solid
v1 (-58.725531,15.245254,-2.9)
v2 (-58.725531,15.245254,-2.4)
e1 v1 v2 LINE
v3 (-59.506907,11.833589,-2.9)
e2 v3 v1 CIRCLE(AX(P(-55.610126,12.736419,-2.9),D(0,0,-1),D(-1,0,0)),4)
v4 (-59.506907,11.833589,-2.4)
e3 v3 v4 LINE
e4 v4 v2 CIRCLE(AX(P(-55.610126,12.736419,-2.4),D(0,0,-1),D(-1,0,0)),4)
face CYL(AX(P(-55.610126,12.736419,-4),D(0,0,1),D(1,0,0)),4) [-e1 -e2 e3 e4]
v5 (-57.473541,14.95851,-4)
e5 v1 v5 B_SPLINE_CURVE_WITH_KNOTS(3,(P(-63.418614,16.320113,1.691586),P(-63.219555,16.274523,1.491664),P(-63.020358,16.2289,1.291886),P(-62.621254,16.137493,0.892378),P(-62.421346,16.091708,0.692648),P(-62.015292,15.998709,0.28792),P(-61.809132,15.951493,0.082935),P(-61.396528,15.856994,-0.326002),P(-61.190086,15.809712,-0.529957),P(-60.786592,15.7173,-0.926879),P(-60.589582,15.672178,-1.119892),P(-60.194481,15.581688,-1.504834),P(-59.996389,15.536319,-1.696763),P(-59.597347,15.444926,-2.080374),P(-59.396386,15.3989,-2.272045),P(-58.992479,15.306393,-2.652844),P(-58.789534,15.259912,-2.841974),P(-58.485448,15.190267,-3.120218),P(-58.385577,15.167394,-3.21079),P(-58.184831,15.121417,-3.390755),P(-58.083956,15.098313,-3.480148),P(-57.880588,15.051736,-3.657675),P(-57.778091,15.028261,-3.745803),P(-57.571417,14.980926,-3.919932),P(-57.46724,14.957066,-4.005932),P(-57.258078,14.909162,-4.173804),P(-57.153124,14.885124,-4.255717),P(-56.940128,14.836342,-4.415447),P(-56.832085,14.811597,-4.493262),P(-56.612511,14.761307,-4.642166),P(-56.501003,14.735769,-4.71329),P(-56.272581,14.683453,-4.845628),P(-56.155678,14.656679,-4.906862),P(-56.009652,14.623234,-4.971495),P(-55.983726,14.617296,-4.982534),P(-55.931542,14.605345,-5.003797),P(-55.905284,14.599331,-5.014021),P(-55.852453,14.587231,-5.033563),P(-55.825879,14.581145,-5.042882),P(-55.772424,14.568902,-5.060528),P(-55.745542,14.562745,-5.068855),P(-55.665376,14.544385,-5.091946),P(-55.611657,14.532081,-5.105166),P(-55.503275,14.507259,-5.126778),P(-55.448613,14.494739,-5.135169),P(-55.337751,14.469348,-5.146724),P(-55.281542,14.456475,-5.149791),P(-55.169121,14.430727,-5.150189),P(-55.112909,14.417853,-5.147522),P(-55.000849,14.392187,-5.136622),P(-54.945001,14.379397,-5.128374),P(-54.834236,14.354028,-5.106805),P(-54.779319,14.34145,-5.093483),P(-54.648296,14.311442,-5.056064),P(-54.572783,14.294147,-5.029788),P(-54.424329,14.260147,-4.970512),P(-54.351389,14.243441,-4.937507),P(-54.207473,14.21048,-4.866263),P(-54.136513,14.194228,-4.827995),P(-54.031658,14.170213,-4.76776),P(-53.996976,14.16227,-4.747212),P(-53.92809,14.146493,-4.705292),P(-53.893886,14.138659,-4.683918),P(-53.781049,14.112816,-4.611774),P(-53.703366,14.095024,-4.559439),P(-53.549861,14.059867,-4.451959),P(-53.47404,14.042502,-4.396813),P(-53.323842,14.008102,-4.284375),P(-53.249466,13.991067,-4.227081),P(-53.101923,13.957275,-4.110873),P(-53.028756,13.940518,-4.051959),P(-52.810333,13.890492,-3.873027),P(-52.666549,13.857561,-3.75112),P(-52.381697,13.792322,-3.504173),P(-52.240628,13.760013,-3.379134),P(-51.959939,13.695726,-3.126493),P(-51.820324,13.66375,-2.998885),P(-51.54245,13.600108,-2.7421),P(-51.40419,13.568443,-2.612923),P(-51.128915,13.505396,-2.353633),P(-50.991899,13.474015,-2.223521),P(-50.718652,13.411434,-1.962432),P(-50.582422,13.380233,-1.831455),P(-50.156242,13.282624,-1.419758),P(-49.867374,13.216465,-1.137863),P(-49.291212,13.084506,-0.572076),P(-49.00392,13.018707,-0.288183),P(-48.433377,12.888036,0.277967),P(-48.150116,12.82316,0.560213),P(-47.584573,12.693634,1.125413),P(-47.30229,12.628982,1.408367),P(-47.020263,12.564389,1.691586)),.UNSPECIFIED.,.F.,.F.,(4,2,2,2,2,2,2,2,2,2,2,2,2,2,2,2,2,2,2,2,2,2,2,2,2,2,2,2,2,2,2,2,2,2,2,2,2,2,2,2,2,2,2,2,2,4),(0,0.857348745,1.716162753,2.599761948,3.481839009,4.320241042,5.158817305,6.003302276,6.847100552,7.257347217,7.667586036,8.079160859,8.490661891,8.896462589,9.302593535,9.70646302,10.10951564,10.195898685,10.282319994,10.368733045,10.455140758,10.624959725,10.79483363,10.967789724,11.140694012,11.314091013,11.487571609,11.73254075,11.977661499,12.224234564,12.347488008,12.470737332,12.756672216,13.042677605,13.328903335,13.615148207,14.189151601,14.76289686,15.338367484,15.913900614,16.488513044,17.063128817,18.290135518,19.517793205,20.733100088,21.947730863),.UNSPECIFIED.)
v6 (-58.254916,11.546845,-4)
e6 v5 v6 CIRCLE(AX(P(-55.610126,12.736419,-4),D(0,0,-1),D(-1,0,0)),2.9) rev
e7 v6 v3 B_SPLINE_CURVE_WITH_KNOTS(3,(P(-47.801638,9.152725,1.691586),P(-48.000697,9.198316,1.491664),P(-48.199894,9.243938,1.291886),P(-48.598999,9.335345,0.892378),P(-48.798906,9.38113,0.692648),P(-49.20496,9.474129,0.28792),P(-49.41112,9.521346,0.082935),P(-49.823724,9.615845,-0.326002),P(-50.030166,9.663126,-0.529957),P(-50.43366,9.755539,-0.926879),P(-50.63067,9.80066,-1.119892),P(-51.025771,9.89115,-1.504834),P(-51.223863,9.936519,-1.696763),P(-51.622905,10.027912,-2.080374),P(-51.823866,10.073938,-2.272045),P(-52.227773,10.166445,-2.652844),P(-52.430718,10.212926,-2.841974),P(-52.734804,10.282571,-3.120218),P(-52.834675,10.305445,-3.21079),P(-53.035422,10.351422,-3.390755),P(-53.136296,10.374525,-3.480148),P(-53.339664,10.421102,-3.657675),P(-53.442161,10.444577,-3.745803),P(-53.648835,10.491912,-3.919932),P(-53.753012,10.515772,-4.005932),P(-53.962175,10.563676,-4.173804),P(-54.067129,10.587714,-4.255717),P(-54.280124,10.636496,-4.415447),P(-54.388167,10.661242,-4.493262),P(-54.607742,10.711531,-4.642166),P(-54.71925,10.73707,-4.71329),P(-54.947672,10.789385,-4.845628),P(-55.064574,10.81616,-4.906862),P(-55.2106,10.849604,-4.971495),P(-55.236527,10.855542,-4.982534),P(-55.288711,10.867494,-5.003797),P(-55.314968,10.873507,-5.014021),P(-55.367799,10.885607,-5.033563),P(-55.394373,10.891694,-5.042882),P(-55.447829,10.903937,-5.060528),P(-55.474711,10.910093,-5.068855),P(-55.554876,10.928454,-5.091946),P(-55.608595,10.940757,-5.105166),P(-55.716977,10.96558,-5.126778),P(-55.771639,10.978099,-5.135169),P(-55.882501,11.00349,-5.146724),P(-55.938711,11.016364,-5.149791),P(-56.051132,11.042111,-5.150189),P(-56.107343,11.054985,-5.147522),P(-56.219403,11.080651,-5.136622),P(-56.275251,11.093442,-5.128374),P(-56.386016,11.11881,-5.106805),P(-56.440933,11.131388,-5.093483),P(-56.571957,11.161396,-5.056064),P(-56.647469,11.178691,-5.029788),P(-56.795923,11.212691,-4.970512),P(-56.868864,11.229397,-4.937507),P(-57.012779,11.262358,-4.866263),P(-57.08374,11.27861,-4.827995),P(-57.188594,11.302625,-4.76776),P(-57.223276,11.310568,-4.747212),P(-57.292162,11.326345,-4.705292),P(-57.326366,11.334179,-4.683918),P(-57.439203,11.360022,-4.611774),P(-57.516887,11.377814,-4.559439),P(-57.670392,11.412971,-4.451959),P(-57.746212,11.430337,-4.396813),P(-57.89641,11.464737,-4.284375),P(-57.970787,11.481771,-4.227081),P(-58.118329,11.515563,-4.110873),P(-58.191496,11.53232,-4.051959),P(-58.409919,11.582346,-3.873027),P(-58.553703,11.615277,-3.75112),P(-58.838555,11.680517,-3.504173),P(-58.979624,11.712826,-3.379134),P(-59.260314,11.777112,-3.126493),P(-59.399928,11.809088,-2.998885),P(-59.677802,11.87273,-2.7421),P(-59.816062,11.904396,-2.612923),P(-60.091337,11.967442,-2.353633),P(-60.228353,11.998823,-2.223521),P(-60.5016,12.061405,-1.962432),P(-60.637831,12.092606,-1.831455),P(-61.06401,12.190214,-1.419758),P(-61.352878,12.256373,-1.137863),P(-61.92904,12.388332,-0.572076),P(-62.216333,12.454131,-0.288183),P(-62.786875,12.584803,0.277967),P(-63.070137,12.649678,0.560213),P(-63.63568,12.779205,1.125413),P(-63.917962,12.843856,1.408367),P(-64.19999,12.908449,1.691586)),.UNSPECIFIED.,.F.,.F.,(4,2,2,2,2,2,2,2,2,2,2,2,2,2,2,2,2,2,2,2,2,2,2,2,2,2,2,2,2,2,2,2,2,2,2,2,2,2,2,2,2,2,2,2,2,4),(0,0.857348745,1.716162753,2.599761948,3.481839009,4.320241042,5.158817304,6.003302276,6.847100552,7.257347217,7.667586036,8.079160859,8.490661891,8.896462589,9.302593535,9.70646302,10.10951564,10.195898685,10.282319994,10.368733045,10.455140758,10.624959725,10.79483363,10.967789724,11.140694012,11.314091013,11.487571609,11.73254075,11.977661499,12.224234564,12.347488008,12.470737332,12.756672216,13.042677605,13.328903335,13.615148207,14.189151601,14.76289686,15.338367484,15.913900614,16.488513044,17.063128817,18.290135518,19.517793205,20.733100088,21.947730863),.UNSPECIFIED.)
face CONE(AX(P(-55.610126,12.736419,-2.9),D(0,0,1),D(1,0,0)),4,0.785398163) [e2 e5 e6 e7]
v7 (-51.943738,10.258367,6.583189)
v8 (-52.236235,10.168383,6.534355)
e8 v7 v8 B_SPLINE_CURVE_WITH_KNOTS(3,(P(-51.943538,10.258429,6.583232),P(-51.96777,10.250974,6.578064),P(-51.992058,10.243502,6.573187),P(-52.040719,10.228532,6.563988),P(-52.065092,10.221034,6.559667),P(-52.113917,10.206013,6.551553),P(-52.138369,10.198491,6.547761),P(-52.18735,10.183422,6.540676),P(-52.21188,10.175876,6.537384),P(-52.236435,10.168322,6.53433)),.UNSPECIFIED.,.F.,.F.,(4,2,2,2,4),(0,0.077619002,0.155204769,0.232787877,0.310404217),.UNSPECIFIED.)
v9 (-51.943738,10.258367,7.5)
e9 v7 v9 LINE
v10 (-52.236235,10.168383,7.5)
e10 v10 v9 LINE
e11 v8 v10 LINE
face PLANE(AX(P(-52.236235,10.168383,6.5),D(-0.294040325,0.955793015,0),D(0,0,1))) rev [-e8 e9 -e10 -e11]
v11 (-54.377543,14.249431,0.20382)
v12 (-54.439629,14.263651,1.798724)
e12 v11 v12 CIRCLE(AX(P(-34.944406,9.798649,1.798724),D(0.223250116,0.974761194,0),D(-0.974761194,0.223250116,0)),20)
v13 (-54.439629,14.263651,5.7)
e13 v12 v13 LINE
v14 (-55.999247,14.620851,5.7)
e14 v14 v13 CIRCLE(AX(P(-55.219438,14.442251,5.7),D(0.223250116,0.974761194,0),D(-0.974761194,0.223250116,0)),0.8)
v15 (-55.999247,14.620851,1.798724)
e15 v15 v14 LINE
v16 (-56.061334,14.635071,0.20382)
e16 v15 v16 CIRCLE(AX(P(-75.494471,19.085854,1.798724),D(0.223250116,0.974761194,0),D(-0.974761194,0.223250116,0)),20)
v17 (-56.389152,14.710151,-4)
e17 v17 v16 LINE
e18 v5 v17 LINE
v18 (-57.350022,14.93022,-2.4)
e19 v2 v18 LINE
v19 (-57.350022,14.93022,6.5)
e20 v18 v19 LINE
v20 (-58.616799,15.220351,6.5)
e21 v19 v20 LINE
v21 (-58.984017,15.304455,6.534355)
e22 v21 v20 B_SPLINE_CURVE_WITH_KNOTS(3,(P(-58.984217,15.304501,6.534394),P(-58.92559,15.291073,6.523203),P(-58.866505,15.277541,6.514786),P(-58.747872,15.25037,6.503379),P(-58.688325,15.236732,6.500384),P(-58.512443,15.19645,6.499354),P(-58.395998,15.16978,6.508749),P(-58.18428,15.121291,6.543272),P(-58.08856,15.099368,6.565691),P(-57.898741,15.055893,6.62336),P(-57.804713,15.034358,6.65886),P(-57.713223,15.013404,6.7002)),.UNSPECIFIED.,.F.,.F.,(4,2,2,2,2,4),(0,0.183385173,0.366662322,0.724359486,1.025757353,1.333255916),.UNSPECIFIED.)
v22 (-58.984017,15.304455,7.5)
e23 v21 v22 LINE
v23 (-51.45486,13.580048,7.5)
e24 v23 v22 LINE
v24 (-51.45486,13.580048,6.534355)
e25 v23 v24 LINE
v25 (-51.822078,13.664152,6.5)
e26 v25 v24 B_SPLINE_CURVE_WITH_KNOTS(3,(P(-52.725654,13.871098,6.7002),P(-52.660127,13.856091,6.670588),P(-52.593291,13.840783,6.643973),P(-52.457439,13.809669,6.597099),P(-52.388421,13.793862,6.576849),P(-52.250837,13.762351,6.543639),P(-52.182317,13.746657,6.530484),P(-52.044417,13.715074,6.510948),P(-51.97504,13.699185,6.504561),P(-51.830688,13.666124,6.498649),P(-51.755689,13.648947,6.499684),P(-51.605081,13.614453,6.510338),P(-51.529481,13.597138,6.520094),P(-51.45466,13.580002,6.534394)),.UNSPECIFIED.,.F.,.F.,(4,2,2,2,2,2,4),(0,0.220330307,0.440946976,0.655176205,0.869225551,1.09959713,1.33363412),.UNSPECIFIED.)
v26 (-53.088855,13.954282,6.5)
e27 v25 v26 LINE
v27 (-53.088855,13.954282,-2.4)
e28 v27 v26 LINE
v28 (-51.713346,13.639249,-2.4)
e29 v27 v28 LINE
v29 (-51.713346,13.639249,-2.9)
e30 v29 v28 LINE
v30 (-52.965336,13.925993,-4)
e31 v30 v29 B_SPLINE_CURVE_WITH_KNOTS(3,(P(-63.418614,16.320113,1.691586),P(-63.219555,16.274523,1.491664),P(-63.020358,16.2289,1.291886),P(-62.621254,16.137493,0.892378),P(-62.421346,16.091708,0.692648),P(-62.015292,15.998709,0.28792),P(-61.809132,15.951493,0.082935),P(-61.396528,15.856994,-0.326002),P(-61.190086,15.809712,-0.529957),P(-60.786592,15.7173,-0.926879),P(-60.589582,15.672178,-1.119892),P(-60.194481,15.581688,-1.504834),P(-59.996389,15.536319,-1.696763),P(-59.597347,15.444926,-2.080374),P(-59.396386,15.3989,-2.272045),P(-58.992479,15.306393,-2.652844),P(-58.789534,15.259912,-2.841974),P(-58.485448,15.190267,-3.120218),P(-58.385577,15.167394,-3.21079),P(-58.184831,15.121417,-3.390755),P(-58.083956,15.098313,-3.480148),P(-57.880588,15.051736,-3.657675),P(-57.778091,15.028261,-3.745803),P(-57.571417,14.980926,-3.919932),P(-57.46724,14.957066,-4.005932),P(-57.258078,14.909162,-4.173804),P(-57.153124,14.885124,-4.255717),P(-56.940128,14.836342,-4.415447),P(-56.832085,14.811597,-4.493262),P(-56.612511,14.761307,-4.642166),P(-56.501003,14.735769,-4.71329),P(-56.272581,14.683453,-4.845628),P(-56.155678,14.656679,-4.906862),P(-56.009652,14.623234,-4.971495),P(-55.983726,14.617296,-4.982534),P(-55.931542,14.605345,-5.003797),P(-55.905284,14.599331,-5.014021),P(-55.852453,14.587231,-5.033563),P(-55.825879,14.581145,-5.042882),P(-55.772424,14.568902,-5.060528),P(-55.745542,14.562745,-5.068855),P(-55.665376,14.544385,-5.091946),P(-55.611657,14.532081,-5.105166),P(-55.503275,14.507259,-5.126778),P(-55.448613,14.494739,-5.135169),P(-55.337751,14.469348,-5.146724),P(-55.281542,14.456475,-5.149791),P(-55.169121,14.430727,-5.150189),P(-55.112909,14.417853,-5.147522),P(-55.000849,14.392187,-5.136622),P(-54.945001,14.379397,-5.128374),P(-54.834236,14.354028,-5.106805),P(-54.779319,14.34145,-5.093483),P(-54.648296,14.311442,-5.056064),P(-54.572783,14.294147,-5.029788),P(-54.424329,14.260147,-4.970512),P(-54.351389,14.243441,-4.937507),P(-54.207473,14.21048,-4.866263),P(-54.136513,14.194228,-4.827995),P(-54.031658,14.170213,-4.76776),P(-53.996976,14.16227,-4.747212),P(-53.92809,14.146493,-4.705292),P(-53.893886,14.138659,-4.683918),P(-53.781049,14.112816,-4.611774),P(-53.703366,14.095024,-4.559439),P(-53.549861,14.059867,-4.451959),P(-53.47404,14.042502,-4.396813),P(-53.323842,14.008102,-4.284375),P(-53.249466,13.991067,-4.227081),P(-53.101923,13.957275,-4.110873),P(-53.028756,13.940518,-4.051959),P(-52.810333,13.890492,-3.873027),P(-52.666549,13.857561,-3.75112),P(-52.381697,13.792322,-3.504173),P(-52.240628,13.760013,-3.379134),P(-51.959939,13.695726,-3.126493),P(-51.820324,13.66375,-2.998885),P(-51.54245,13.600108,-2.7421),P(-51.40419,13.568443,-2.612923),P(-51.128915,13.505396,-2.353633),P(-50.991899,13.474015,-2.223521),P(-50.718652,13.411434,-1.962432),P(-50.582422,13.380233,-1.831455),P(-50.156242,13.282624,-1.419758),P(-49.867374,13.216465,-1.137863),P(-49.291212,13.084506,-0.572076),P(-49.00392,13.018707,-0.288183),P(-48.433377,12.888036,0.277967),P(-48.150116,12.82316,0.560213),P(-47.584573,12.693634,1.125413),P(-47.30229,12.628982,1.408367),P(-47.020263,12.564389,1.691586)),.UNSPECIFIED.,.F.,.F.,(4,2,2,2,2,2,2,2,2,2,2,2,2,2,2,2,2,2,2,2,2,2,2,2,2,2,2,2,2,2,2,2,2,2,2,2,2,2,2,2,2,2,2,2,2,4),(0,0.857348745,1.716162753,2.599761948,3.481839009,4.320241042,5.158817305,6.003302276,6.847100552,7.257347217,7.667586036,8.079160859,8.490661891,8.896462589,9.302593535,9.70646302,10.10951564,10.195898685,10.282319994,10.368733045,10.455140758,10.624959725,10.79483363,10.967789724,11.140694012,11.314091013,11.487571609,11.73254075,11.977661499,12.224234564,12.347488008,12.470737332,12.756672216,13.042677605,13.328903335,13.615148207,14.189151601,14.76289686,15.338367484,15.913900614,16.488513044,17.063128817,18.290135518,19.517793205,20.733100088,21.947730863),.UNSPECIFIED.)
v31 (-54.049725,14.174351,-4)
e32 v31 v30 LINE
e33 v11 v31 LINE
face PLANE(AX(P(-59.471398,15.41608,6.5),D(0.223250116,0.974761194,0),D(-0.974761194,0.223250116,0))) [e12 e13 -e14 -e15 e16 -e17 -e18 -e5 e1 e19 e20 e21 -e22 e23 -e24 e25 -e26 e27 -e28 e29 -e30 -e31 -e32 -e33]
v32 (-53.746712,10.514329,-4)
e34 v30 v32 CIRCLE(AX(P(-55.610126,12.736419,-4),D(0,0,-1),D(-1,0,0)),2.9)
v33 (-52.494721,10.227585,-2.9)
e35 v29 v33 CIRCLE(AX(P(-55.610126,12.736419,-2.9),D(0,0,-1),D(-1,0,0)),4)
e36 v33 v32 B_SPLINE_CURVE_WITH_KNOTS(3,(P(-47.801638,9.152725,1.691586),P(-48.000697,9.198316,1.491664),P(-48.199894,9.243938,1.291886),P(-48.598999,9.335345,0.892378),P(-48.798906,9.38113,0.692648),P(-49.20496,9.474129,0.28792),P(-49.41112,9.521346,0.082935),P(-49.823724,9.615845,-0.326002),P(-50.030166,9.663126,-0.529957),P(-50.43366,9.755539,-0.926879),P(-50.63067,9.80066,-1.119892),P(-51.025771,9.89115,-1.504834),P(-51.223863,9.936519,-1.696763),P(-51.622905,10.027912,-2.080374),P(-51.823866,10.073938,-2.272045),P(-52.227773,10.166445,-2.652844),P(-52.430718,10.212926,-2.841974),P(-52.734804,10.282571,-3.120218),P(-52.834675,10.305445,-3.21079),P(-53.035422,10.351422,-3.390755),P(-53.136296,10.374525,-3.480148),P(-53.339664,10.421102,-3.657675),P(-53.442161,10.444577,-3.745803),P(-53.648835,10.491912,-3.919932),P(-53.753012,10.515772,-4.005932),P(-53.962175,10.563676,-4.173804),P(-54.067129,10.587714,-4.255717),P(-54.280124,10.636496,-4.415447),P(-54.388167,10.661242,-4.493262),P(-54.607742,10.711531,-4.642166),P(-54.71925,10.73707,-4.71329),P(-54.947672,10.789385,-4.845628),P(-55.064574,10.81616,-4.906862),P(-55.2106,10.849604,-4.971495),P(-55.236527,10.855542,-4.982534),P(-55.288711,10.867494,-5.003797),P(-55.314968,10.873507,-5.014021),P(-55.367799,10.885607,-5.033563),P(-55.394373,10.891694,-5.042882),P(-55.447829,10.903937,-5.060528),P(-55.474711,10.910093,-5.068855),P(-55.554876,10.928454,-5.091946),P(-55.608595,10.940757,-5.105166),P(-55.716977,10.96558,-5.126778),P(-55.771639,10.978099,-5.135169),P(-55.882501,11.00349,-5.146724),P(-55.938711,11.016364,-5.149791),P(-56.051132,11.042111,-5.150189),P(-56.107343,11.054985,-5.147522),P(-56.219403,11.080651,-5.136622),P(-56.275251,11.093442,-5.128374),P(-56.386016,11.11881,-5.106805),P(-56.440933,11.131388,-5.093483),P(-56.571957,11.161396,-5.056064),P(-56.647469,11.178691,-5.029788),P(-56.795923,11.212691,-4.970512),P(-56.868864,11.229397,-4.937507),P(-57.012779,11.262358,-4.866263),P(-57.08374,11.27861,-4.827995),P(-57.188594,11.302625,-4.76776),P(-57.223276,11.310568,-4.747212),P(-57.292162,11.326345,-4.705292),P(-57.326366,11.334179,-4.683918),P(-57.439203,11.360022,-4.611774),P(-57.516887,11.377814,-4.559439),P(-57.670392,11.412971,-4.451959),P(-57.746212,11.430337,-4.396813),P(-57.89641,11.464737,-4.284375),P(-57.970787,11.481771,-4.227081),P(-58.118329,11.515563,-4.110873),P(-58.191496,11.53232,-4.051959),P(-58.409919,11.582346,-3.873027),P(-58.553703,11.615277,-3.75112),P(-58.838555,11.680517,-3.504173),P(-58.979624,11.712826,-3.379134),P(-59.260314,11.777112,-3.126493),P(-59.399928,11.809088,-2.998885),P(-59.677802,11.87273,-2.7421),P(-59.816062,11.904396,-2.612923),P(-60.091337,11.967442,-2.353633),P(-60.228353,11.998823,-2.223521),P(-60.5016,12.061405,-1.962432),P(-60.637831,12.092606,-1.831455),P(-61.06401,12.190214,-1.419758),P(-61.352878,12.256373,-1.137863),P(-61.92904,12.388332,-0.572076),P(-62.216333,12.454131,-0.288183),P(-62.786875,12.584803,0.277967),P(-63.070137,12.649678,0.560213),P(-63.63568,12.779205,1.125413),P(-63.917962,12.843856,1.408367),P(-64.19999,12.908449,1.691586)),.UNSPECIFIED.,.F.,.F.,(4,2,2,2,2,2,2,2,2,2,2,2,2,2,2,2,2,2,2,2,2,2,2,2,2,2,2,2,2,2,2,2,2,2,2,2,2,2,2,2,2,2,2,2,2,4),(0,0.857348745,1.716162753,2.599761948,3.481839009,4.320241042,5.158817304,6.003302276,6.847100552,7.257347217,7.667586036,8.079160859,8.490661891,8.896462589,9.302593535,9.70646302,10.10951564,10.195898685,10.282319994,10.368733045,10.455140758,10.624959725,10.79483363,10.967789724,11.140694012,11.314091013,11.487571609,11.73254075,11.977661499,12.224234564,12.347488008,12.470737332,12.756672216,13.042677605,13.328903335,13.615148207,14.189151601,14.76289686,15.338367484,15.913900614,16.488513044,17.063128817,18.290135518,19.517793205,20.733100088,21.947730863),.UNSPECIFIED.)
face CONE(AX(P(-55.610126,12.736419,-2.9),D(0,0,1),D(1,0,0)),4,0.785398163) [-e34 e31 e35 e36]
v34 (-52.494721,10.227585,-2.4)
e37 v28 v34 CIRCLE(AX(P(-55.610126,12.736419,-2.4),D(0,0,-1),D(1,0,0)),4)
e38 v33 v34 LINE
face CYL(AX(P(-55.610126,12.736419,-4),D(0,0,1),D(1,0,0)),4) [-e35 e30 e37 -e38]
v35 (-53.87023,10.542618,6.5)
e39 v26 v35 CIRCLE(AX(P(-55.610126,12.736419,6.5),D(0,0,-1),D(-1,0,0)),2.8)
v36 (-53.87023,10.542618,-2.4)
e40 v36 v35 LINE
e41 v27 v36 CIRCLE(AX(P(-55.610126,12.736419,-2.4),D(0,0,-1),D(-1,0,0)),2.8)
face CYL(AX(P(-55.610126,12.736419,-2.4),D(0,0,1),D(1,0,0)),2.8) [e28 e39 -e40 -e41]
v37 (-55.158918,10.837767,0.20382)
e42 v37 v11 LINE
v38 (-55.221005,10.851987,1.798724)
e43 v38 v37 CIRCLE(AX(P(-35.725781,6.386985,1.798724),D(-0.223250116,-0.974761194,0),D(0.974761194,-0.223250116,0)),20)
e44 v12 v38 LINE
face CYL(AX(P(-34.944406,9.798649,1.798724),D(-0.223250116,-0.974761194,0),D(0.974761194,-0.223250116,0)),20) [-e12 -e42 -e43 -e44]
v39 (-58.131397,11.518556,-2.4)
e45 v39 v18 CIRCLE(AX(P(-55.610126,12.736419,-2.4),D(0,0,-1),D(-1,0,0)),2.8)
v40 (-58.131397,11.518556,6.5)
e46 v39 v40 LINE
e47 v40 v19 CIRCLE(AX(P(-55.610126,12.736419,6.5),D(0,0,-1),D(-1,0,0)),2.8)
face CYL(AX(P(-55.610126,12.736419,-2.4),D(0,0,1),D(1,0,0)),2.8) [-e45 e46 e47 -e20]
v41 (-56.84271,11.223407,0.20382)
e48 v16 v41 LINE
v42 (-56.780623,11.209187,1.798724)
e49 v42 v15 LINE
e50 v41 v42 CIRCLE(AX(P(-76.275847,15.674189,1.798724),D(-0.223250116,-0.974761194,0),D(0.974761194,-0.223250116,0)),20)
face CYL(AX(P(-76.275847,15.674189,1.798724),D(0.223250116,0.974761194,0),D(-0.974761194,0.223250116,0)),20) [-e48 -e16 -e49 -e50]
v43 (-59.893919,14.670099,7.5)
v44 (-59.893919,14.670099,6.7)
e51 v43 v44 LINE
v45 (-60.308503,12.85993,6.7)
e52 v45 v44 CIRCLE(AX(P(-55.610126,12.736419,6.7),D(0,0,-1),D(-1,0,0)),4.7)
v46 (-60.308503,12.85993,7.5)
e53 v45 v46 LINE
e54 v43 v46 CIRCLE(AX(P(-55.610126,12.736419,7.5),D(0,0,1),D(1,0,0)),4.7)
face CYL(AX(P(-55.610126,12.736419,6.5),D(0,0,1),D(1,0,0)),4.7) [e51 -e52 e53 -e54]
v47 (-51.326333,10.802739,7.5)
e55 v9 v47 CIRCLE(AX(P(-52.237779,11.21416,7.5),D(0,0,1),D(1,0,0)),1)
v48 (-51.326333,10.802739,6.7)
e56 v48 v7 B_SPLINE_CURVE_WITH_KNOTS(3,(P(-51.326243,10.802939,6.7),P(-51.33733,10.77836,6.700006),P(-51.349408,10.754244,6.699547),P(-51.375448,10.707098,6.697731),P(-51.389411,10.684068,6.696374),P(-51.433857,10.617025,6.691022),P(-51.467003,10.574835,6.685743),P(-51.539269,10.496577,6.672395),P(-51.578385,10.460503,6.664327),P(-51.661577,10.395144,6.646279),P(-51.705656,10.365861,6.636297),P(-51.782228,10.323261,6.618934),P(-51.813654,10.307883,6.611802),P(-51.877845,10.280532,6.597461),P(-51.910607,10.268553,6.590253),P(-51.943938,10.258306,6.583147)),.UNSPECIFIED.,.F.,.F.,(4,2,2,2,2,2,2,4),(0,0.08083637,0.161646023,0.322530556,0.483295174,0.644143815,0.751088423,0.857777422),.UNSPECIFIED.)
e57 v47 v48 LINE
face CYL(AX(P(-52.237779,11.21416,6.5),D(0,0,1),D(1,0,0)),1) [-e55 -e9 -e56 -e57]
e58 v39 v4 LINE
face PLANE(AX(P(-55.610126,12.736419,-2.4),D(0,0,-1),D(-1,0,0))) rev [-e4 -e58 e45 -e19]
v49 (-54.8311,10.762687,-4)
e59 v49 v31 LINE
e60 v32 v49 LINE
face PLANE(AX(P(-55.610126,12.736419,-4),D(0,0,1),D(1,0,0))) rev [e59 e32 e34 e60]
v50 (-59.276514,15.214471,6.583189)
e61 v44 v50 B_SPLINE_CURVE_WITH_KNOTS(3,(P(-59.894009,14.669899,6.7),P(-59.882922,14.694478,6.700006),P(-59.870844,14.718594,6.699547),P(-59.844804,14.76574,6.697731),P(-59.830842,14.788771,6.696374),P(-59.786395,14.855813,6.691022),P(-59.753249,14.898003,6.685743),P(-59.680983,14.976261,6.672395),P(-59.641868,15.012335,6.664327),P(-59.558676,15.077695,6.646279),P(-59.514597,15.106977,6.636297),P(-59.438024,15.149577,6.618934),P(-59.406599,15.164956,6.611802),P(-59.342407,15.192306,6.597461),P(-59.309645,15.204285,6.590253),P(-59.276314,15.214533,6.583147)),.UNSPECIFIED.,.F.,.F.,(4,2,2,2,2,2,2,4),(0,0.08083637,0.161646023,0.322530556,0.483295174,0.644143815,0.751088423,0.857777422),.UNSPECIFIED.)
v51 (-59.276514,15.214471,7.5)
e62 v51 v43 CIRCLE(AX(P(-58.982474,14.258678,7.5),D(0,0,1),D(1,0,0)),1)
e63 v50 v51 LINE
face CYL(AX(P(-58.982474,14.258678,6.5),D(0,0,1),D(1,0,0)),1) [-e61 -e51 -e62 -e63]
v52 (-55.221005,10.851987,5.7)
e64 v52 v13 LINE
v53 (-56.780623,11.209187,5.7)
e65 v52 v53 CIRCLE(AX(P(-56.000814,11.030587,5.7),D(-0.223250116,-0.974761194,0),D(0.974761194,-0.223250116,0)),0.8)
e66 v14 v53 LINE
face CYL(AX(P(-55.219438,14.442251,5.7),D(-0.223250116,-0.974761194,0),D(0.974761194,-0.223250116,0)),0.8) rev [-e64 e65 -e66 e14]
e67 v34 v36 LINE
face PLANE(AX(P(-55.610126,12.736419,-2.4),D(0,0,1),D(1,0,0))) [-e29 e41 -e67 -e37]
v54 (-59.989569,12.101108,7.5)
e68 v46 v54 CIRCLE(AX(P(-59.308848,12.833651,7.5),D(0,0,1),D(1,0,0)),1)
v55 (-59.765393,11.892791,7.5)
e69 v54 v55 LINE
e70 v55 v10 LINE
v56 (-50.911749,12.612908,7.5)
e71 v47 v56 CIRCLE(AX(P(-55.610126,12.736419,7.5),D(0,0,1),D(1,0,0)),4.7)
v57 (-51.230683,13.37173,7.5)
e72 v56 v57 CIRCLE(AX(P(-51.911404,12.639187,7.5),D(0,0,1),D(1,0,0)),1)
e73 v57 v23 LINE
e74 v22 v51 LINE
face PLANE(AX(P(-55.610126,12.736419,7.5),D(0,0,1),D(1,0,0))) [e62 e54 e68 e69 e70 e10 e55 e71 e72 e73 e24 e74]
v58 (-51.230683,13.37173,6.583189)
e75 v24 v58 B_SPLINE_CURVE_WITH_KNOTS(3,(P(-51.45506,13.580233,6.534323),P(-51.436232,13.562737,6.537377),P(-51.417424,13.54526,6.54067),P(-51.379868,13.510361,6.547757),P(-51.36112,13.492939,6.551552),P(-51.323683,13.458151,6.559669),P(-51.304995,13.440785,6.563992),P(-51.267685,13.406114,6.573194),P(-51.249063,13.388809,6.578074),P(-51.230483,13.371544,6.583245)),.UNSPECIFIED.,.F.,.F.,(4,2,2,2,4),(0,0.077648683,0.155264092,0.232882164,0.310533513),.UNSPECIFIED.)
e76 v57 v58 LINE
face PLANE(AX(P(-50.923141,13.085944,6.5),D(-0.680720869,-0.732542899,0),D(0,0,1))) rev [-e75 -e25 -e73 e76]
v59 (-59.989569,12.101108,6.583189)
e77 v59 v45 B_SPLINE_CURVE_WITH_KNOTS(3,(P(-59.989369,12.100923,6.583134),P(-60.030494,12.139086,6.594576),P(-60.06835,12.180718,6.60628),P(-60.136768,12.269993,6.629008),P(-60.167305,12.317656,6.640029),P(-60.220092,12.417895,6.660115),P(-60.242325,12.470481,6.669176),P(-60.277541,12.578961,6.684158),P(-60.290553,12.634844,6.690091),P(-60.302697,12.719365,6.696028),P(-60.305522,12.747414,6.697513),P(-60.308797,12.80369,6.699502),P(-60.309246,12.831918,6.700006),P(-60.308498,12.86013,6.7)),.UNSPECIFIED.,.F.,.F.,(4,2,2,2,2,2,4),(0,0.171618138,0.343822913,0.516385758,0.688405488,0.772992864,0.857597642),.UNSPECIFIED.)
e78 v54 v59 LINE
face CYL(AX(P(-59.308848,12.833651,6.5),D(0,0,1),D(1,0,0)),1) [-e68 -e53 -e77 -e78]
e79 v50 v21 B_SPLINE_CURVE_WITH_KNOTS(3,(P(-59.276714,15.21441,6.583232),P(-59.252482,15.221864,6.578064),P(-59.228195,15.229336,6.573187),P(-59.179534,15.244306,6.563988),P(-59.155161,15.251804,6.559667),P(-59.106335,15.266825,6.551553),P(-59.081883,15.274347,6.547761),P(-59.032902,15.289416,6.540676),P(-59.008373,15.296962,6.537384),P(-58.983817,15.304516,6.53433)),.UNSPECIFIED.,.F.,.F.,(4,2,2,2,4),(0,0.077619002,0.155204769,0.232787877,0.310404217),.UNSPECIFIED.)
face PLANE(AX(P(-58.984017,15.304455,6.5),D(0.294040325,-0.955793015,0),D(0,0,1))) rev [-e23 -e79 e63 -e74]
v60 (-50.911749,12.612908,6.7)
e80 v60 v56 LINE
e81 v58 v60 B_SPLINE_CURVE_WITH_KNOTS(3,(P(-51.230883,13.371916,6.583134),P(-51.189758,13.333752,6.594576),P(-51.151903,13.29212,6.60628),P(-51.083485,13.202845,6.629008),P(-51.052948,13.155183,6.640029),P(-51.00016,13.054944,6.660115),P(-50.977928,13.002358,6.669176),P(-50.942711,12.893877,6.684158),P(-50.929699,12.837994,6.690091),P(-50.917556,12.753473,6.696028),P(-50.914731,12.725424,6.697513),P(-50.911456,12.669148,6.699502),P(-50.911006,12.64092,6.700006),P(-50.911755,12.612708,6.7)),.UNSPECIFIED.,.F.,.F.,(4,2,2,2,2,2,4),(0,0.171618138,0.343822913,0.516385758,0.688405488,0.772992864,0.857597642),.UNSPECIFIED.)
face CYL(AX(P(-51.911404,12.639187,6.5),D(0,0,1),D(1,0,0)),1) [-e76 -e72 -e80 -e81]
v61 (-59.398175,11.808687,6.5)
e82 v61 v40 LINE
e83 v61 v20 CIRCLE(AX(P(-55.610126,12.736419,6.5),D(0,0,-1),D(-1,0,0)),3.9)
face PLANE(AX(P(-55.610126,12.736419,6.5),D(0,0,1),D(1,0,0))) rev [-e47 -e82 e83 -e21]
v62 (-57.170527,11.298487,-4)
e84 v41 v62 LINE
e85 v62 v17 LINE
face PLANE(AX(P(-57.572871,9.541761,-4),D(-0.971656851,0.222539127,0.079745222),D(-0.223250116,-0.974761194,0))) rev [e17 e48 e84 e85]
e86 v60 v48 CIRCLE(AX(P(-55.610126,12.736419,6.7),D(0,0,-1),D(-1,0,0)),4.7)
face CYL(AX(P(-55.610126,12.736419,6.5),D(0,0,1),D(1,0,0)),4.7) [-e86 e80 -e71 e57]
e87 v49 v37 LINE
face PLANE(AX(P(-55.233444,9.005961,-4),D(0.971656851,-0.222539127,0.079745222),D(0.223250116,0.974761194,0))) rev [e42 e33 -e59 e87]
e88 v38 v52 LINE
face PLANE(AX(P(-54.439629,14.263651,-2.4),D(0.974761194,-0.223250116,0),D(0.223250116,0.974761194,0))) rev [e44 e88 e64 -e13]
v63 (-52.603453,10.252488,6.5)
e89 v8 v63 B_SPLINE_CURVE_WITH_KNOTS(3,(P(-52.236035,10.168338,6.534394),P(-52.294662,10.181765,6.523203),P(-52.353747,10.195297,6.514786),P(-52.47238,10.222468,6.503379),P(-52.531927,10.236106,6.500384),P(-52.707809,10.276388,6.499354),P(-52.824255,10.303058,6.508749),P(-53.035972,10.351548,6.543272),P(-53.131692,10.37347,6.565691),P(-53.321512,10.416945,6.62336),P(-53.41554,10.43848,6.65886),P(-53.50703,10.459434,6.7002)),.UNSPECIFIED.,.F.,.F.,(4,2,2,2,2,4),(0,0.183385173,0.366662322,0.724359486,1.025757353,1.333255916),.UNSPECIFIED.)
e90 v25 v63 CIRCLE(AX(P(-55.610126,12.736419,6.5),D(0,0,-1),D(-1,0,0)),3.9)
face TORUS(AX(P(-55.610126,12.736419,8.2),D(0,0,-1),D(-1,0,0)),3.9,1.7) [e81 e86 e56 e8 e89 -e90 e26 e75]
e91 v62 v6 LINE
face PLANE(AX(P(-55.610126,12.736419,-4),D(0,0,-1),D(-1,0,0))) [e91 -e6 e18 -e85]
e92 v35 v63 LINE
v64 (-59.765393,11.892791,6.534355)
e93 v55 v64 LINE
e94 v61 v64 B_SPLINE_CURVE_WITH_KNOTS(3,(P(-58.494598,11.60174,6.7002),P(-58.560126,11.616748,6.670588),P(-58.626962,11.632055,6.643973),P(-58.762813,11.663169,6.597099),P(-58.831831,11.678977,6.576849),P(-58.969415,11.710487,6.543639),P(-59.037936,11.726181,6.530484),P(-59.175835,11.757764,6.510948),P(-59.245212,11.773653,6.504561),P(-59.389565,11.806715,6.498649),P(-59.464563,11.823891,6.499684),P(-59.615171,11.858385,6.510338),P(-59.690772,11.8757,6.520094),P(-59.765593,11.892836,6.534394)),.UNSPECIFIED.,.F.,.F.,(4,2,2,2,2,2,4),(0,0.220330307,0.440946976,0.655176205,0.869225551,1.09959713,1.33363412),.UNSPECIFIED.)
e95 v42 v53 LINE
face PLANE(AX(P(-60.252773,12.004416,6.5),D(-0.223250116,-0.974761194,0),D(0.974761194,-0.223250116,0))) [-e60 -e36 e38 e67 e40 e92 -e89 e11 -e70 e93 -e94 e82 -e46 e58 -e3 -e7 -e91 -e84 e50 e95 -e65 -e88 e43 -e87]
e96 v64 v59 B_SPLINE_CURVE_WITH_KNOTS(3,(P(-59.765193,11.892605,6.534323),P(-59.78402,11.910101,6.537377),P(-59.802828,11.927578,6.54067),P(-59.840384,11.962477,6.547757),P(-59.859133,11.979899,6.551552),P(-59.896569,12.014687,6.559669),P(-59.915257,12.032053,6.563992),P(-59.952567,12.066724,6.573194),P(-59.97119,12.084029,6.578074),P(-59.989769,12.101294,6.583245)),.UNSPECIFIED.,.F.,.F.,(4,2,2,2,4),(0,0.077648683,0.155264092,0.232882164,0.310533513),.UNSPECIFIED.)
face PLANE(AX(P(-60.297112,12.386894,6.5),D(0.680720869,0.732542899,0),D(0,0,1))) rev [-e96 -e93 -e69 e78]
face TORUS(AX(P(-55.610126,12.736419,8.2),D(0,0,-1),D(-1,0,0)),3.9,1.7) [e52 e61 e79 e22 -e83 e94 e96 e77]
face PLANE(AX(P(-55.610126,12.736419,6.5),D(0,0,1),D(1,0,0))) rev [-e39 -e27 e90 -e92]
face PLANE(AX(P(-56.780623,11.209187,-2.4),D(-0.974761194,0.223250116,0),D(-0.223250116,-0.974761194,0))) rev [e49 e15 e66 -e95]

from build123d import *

# Parameters (mm, degrees)
BOSS_EXTRUDE1_DEPTH     = 1
CHAMFER1_SIZE           = 0.5
FILLET1_R               = 1
BOSS_EXTRUDE2_DEPTH     = 8.9
BOSS_EXTRUDE3_DEPTH     = 1.6
CUT_EXTRUDE1_DEPTH      = 63.654658492
CUT_EXTRUDE1_DEPTH_BACK = 63.654658492
FILLET2_R               = 20
FILLET3_R               = 0.8


# Some blends are built 0.0001 mm under size
with BuildPart() as part:
    # Sketch3 → Boss-Extrude1 (new body)
    with BuildSketch(Plane.XY.offset(7.5)):
        with BuildLine():
            Line((-59.471397705, 15.416079883), (-50.967479146, 13.468422533))
            ThreePointArc((-50.967479146, 13.468422533), (-51.028748516, 11.687143573), (-51.748854552, 10.056758353))
            Line((-51.748854552, 10.056758353), (-60.252773111, 12.004415704))
            ThreePointArc((-60.252773111, 12.004415704), (-60.191503741, 13.785694664), (-59.471397705, 15.416079883))
        make_face()
    extrude(amount=-BOSS_EXTRUDE1_DEPTH)

    # Chamfer1
    # the kernel refuses this chamfer: 0.5, 0.404802776 mm, written as the material it takes off along each edge
    with BuildSketch(Plane(origin=(-59.471397705, 15.416079883, 8.793542877), x_dir=(0.9747611941912204, -0.2232501160109568, 0), z_dir=(0, 0, -1))) as chamfer1_piece_1:
        with BuildLine():
            Line((CHAMFER1_SIZE, 0), (-0.128607842, 0.362926907))
            ThreePointArc((-0.128607842, 0.362926907), (-0.070555149, 0.18731274), (0, 0))
            Line((0, 0), (CHAMFER1_SIZE, 0))
        make_face()
    extrude(amount=3.587085755, mode=Mode.SUBTRACT)
    with BuildSketch(Plane(origin=(-50.967479146, 13.468422533, 8.793542877), x_dir=(-0.9747611941912215, 0.22325011601095288, 0), z_dir=(0, 0, -1)), Plane(origin=(-60.252773111, 12.004415704, 8.793542877), x_dir=(0.9747611941912214, -0.22325011601095318, 0), z_dir=(0, 0, -1))) as chamfer1_piece_2:
        with BuildLine():
            Line((CHAMFER1_SIZE, 0), (-0.128607842, -0.362926907))
            ThreePointArc((-0.128607842, -0.362926907), (-0.070555149, -0.18731274), (0, 0))
            Line((0, 0), (CHAMFER1_SIZE, 0))
        make_face()
    extrude(amount=3.587085755, mode=Mode.SUBTRACT)
    with BuildSketch(Plane(origin=(-51.748854552, 10.056758353, 8.793542877), x_dir=(0.5360100963407745, 0.8442115710061985, 0), z_dir=(0, 0, -1))) as chamfer1_piece_3:
        with BuildLine():
            Line((0.385040149, 0), (-CHAMFER1_SIZE * 0.334011510443, -CHAMFER1_SIZE * 0.942568995295))
            Line((-CHAMFER1_SIZE * 0.334011510443, -CHAMFER1_SIZE * 0.942568995295), (0, 0))
            ThreePointArc((0, 0), (0.200121413, 0.003938485), (0.385040149, 0))
        make_face()
    extrude(amount=3.587085755, mode=Mode.SUBTRACT)

    # Fillet1
    fillet1_edges = [part.edges().sort_by_distance(p)[0] for p in [
        (-50.923140687, 13.085943752, 7),
        (-51.542469145, 10.381813703, 7),
        (-59.677783112, 15.091024534, 7),
        (-60.29711157, 12.386894484, 7),
    ]]
    fillet(fillet1_edges, radius=FILLET1_R)

    # Sketch5 → Cut-Revolve1 (revolve, cut)
    with BuildSketch(Plane(origin=(0, 0, 0), x_dir=(0.9747611941912216, -0.22325011601095204, 0), z_dir=(0.22325011601095204, 0.9747611941912216, 0))):
        with BuildLine():
            Line((-60.95, -6.5), (-61.75, -6.5))
            Line((-61.75, -6.5), (-61.75, -6.7))
            ThreePointArc((-61.75, -6.7), (-61.362310563, -6.55075775), (-60.95, -6.5))
        make_face()
    revolve(axis=Axis((-55.610126129, 12.736419118, 6.5), (0, 0, 1)), mode=Mode.SUBTRACT)

    # Sketch6 → Boss-Extrude2 (add)
    with BuildSketch(Plane(origin=(0, 0, 6.5), x_dir=(-1, 0, 0), z_dir=(0, 0, -1))):
        with BuildLine():
            Line((58.131397429, 11.518555813), (56.780622787, 11.209187121))
            Line((56.780622787, 11.209187121), (55.999247381, 14.620851301))
            Line((55.999247381, 14.620851301), (57.350022023, 14.930219993))
            ThreePointArc((57.350022023, 14.930219993), (58.339457472, 13.361519443), (58.131397429, 11.518555813))
        make_face()
        with BuildLine():
            Line((55.221004876, 10.851986936), (53.870230234, 10.542618244))
            ThreePointArc((53.870230234, 10.542618244), (52.880794785, 12.111318794), (53.088854828, 13.954282424))
            Line((53.088854828, 13.954282424), (54.43962947, 14.263651115))
            Line((54.43962947, 14.263651115), (55.221004876, 10.851986936))
        make_face()
    extrude(amount=BOSS_EXTRUDE2_DEPTH)

    # Sketch7 → Boss-Extrude3 (add)
    with BuildSketch(Plane(origin=(0, 0, -2.4), x_dir=(-1, 0, 0), z_dir=(0, 0, -1))):
        with BuildLine():
            Line((54.43962947, 14.263651115), (51.713345578, 13.63924875))
            ThreePointArc((51.713345578, 13.63924875), (51.711081352, 11.843418654), (52.494720985, 10.227584571))
            Line((52.494720985, 10.227584571), (55.221004876, 10.851986936))
            Line((55.221004876, 10.851986936), (54.43962947, 14.263651115))
        make_face()
        with BuildLine():
            Line((55.999247381, 14.620851301), (58.725531273, 15.245253666))
            ThreePointArc((58.725531273, 15.245253666), (59.509170905, 13.629419582), (59.506906679, 11.833589487))
            Line((59.506906679, 11.833589487), (56.780622787, 11.209187121))
            Line((56.780622787, 11.209187121), (55.999247381, 14.620851301))
        make_face()
    extrude(amount=BOSS_EXTRUDE3_DEPTH)

    # Sketch8 → Cut-Revolve2 (revolve, cut)
    with BuildSketch(Plane(origin=(0, 0, 0), x_dir=(0.9747611941912216, -0.22325011601095204, 0), z_dir=(0.22325011601095204, 0.9747611941912216, 0))):
        Polygon((-61.05, 2.9), (-59.95, 4), (-61.05, 4), align=None)
    revolve(axis=Axis((-55.610126129, 12.736419118, 6.5), (0, 0, 1)), mode=Mode.SUBTRACT)

    # Sketch9 → Cut-Extrude1 (cut, two sides: drawn at the far end of the back side and taken through both)
    with BuildSketch(Plane(origin=(0.390687703, 1.70583209, 0), x_dir=(0.9747611941912216, -0.22325011601095204, 0), z_dir=(0.22325011601095204, 0.9747611941912216, 0)).offset(-CUT_EXTRUDE1_DEPTH_BACK)):
        Polygon((-58.25, 4), (-57.85, -1), (-57.85, 4), align=None)
        Polygon((-55.85, 4), (-56.25, -1), (-56.25, 4), align=None)
    extrude(amount=CUT_EXTRUDE1_DEPTH + CUT_EXTRUDE1_DEPTH_BACK, mode=Mode.SUBTRACT)

    # Fillet2
    # the kernel refuses this fillet: 20 mm, written as the material it takes off along each edge
    with BuildSketch(Plane(origin=(-53.993841362, 16.21006421, 1), x_dir=(0, 0, 1), z_dir=(-0.22325011601095204, -0.9747611941912216, 0))) as fillet2_piece_1:
        with BuildLine():
            CenterArc((FILLET2_R * 0.0399362039845, -FILLET2_R), FILLET2_R, 90, 4.57392126)
            Line((-FILLET2_R * 0.0398090182984, -FILLET2_R * 0.00318472146388), (0, 0))
            Line((0, 0), (FILLET2_R * 0.0399362039845, 0))
        make_face()
    extrude(amount=7.493620398, mode=Mode.SUBTRACT)
    with BuildSketch(Plane(origin=(-57.226410896, 9.262774027, 1), x_dir=(-0.07773254810353018, 0.01780313012597799, -0.9968152785361237), z_dir=(0.223250116010952, 0.9747611941912216, 0))) as fillet2_piece_2:
        with BuildLine():
            CenterArc((FILLET2_R * 0.0399362039845, FILLET2_R), FILLET2_R, 265.42607874, 4.57392126)
            Line((-FILLET2_R * 0.0398090182984, FILLET2_R * 0.00318472146388), (0, 0))
            Line((0, 0), (FILLET2_R * 0.0399362039845, 0))
        make_face()
    extrude(amount=7.493620398, mode=Mode.SUBTRACT)

    # Fillet3
    fillet3_edges = [part.edges().sort_by_distance(p)[0] for p in [
        (-54.830317173, 12.557819026, 6.5),
        (-56.389935084, 12.915019211, 6.5),
    ]]
    fillet(fillet3_edges, radius=FILLET3_R - 0.0001)  # a hair under: the kernel refuses the full size


solid = part.part
